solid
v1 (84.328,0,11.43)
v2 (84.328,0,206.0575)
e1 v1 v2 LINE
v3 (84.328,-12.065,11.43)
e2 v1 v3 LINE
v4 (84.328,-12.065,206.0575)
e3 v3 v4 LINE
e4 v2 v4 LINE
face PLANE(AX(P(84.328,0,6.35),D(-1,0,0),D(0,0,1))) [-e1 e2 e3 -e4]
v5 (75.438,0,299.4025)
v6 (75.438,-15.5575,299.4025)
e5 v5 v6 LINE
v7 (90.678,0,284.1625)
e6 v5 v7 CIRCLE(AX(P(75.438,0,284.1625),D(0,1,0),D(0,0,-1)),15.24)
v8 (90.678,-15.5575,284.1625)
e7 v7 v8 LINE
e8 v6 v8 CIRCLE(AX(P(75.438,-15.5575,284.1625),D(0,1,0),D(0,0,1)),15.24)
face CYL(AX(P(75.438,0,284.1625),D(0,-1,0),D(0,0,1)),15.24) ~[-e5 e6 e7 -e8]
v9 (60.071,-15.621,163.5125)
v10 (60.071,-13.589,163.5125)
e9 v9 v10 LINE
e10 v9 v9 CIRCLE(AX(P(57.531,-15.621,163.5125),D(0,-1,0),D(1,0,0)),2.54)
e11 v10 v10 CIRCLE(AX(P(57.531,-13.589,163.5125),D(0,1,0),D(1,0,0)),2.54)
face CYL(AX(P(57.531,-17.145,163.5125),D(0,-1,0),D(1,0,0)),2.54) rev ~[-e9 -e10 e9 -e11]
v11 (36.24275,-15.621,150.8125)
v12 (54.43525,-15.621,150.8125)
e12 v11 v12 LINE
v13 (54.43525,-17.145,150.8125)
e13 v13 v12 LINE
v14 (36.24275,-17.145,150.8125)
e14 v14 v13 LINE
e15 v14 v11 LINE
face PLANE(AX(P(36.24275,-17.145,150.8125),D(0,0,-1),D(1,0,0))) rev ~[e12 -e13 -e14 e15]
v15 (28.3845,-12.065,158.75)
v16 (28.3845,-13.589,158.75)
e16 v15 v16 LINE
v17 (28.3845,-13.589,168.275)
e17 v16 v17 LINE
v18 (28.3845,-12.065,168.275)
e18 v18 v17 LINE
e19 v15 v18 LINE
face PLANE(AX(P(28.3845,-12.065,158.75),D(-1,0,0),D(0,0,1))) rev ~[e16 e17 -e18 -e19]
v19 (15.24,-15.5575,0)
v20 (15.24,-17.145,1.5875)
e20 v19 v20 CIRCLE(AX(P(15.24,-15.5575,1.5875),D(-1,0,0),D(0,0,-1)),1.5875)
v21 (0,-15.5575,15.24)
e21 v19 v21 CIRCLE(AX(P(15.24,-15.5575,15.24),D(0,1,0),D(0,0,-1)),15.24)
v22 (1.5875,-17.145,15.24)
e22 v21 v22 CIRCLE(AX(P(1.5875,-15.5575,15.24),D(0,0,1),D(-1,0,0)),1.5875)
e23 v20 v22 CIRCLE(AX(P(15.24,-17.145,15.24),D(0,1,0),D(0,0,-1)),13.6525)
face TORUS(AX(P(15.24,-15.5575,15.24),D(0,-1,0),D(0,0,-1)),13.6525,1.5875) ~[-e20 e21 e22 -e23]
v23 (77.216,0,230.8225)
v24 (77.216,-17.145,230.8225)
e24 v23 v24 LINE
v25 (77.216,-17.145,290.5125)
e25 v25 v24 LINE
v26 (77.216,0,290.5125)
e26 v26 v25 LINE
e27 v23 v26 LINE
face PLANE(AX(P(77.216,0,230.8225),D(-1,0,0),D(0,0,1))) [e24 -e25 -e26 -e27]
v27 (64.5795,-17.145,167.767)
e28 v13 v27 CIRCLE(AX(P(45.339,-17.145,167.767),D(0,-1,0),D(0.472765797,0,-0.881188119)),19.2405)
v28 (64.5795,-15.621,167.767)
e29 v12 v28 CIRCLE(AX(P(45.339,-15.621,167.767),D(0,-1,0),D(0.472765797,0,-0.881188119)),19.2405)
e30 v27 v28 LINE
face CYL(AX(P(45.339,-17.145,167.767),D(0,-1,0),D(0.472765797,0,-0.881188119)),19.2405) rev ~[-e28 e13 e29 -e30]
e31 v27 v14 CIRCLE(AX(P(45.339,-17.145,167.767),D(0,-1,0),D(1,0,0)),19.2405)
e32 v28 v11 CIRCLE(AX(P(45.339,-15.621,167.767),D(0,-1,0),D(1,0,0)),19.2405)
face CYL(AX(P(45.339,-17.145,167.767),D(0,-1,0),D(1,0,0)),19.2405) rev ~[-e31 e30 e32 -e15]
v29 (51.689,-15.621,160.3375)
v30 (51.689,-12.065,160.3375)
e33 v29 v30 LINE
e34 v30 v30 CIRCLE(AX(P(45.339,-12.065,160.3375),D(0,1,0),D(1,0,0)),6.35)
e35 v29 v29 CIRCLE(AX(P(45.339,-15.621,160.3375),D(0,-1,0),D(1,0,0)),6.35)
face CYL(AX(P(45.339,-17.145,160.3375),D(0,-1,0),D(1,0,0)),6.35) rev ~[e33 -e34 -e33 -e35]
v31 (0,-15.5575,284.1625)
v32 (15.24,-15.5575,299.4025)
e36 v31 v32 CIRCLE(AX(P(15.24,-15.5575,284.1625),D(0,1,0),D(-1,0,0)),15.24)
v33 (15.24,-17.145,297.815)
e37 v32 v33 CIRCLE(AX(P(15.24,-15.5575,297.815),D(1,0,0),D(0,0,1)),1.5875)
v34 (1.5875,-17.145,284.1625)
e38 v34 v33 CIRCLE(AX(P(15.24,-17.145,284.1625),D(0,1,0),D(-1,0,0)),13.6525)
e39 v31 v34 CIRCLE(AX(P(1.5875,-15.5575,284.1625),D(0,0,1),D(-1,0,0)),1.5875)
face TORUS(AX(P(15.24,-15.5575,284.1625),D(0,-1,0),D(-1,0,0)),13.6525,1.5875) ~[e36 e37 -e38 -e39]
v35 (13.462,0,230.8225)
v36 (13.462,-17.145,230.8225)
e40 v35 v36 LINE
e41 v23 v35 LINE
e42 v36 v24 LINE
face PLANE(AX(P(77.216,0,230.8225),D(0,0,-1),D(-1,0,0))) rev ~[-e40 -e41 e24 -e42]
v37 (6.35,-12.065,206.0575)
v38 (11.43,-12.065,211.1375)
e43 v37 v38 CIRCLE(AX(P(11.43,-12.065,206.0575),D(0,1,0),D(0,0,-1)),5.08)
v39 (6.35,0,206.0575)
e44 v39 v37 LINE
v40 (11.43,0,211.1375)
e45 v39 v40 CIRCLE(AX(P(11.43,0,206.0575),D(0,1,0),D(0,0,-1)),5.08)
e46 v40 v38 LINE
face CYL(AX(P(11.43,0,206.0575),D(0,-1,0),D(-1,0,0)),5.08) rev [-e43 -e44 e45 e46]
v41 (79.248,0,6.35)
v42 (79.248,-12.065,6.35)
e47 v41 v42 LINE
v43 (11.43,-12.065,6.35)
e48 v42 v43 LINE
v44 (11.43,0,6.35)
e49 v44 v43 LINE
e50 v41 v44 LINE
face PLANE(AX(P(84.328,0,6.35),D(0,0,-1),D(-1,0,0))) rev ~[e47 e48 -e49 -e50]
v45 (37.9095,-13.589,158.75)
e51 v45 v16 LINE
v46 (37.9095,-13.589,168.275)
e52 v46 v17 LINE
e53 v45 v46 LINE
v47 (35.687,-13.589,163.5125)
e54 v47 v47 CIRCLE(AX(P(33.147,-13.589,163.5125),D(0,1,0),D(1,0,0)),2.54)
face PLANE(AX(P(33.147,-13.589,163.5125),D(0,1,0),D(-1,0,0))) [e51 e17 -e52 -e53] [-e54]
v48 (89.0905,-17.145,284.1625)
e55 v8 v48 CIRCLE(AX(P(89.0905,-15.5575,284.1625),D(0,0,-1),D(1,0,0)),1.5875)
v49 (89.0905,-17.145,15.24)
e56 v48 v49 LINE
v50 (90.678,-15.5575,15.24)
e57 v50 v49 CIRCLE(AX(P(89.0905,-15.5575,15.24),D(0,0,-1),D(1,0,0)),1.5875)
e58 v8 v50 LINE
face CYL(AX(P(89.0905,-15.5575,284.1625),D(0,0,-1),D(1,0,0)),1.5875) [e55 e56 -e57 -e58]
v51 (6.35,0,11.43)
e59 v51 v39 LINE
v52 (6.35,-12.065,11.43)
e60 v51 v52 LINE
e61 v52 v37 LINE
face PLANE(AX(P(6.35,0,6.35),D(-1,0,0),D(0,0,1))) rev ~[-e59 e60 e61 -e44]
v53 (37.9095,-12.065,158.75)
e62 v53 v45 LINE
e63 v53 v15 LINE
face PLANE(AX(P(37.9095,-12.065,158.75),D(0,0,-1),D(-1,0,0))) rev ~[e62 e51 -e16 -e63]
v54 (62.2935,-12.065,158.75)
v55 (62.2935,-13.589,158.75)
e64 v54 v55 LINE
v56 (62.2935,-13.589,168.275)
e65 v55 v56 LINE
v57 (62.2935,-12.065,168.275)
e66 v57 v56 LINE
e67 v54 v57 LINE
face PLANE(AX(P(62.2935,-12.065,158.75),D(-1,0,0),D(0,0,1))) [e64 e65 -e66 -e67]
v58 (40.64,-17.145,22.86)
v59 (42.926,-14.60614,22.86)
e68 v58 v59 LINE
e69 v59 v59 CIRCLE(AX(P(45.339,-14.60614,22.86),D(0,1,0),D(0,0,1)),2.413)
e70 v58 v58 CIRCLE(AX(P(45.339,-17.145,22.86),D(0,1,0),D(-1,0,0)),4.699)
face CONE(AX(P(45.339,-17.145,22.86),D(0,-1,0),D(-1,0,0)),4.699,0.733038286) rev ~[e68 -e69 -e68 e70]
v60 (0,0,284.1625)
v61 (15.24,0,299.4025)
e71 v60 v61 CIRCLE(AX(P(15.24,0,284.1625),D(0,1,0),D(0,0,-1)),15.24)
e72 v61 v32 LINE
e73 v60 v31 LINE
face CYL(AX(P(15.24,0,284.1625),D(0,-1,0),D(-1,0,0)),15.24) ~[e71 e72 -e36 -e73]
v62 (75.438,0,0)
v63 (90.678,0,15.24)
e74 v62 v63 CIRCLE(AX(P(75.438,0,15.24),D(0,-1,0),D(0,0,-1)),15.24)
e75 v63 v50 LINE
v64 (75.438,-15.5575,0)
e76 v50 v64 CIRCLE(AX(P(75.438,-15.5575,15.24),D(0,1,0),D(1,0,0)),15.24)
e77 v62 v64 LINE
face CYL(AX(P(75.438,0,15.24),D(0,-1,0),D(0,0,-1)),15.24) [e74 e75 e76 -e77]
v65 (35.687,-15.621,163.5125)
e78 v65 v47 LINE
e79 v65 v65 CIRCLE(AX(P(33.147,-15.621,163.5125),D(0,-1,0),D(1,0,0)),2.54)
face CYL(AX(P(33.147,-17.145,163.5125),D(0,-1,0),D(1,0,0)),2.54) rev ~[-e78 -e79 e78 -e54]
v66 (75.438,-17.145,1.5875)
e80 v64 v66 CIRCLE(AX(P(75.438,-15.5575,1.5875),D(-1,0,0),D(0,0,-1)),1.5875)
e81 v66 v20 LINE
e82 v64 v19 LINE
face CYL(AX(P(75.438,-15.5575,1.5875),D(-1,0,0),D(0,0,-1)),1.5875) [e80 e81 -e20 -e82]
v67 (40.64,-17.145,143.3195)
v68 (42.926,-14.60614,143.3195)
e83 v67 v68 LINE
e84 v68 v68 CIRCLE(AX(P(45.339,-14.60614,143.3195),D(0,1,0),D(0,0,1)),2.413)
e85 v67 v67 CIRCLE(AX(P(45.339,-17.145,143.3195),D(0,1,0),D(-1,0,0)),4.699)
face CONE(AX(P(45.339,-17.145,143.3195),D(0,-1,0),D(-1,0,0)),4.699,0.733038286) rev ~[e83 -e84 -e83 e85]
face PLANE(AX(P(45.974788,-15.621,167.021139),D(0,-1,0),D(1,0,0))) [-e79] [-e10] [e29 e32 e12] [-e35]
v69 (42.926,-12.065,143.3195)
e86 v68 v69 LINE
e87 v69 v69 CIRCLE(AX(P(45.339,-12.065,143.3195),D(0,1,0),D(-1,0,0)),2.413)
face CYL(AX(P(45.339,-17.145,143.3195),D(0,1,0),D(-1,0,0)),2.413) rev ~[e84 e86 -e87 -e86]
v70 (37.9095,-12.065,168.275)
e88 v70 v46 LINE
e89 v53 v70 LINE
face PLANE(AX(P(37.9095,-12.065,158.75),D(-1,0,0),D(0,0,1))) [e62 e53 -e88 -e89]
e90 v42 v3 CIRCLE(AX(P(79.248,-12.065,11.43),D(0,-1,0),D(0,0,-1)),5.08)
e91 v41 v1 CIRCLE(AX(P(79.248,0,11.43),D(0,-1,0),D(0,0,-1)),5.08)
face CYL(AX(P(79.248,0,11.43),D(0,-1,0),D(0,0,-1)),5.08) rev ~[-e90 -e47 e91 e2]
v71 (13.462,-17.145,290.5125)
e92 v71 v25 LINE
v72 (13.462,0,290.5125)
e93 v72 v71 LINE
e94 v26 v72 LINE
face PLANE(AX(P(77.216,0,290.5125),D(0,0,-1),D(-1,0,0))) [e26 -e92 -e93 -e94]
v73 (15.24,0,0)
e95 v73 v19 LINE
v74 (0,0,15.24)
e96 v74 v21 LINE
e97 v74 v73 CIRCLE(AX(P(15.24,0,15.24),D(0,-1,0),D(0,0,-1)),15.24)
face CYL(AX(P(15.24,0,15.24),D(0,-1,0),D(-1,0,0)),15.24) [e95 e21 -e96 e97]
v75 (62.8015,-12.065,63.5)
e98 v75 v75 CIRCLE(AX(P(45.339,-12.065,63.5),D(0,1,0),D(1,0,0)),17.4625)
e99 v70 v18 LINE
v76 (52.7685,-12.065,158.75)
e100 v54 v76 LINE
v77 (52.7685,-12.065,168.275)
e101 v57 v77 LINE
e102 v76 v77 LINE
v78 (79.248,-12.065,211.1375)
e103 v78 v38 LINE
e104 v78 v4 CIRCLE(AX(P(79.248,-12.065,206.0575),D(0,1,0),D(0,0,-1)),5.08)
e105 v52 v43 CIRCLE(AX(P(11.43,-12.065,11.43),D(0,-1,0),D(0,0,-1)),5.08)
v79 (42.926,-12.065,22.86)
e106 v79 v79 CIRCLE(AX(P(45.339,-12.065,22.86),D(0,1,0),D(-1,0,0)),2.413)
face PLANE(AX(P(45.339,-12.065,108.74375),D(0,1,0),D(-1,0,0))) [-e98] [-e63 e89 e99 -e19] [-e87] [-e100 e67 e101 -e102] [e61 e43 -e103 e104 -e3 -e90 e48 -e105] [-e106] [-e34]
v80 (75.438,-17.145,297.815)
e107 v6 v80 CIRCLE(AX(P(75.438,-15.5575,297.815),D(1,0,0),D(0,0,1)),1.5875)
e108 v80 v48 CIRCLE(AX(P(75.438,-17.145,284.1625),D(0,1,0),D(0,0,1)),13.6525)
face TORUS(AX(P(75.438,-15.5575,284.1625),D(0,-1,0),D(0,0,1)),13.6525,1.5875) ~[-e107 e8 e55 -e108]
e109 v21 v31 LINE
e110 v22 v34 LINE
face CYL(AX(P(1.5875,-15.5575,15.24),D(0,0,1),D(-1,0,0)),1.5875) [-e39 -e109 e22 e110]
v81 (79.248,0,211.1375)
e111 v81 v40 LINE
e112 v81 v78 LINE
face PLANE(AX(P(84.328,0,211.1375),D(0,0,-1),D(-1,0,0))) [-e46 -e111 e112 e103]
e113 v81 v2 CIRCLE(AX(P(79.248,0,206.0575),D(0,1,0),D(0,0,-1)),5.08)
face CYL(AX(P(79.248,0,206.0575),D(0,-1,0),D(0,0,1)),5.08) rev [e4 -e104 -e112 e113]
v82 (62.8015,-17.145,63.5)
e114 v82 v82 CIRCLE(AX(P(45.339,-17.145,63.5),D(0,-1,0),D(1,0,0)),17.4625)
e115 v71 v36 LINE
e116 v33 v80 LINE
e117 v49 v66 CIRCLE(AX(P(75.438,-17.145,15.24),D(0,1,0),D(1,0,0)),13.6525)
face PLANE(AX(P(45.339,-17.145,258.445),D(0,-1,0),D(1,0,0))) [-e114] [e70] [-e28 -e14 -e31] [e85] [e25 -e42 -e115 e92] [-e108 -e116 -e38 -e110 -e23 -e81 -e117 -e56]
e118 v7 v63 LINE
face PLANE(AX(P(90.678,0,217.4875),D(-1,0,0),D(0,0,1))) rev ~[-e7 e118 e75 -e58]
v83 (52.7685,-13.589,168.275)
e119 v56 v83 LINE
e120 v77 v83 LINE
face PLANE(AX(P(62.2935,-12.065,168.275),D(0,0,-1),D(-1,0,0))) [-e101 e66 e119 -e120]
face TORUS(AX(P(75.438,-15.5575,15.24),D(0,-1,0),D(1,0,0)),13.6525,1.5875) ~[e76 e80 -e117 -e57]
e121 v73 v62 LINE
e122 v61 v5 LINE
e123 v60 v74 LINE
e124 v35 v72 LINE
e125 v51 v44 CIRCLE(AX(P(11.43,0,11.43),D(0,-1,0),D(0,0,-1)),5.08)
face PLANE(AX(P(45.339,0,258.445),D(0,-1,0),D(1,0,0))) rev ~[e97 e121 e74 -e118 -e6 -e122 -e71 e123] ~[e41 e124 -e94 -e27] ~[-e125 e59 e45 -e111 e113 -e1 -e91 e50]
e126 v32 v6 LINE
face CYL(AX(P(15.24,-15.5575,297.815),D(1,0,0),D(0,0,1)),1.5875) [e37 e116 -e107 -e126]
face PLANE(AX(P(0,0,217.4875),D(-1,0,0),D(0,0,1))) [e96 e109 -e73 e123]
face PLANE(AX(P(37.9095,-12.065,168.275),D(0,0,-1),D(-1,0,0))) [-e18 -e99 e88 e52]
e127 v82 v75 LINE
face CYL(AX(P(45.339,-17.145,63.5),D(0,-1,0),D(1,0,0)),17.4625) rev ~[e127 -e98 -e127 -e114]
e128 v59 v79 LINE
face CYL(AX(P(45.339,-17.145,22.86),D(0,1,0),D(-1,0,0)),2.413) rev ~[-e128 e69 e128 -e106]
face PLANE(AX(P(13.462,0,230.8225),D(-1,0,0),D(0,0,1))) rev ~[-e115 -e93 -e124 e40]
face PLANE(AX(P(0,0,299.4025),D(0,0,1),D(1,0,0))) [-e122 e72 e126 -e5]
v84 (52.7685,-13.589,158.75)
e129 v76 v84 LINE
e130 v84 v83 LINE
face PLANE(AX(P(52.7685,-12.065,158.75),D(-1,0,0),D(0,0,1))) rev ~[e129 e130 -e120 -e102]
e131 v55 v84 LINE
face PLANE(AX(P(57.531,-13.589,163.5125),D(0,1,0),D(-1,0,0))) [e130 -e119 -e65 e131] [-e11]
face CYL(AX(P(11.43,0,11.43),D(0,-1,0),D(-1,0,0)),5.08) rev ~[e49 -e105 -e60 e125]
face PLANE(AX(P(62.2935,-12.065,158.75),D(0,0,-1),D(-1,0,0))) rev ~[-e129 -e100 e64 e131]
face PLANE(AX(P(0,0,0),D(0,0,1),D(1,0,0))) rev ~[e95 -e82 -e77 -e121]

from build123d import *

# Parameters (mm, degrees)
F0_W           = 90.678
F0_H           = 217.4875
F1_DEPTH       = 17.145
F3_D           = 4.826
F3_CSINK_D     = 9.398
F3_CSINK_ANGLE = 84
F2_R           = 17.4625
F2_R_2         = 6.35
F2_R_3         = 2.54
F4_DEPTH       = 25.4
F5_W           = 77.978
F5_H           = 204.7875
F5_R           = 2.413
F5_R_2         = 17.4625
F5_R_3         = 6.35
F5_R_4         = 2.54
F6_DEPTH       = 12.065
F7_D           = 4.826
F7_CSINK_D     = 9.398
F7_CSINK_ANGLE = 84
F8_W           = 90.678
F8_H           = 81.915
F9_DEPTH       = 17.145
F10_W          = 63.754
F10_H          = 59.69
F11_DEPTH      = 17.146
F12_DEPTH      = 1.524
F13_W          = 9.525
F13_H          = 9.525
F13_R          = 2.54
F14_DEPTH      = 1.524
F15_R          = 5.08
F16_R          = 15.24
F17_R          = 1.5875


with BuildPart() as f1:
    # F0 (on Front) → F1 (new body)
    with BuildSketch(Plane.XZ):
        with Locations((45.339, 108.74375)):
            Rectangle(F0_W, F0_H)
    extrude(amount=F1_DEPTH)

    # F3 (through all)
    with Locations(Plane.XZ.offset(17.145)):
        with Locations((45.339, 22.86)):
            CounterSinkHole(F3_D / 2, F3_CSINK_D / 2, counter_sink_angle=F3_CSINK_ANGLE)

    # F2 (on face) → F4 (cut)
    with BuildSketch(Plane.XZ.offset(17.145)):
        with Locations((45.339, 63.5)):
            Circle(F2_R)
        with Locations((45.339, 160.3375)):
            Circle(F2_R_2)
        with Locations((33.147, 163.5125)):
            Circle(F2_R_3)
        with Locations((57.531, 163.5125)):
            Circle(F2_R_3)
    extrude(amount=-F4_DEPTH, mode=Mode.SUBTRACT)

    # F5 (on face) → F6 (cut)
    with BuildSketch(Plane(origin=(0, 0, 0), x_dir=(-1, 0, 0), z_dir=(0, 1, 0))):
        with Locations((-45.339, 108.74375)):
            Rectangle(F5_W, F5_H)
        with Locations((-45.339, 22.86)):
            Circle(F5_R, mode=Mode.SUBTRACT)
        with Locations((-45.339, 63.5)):
            Circle(F5_R_2, mode=Mode.SUBTRACT)
        with Locations((-45.339, 160.3375)):
            Circle(F5_R_3, mode=Mode.SUBTRACT)
        with Locations((-57.531, 163.5125)):
            Circle(F5_R_4, mode=Mode.SUBTRACT)
        with Locations((-33.147, 163.5125)):
            Circle(F5_R_4, mode=Mode.SUBTRACT)
    extrude(amount=-F6_DEPTH, mode=Mode.SUBTRACT)

    # F7 (through all)
    with Locations(Plane.XZ.offset(17.145)):
        with Locations((45.339, 143.3195)):
            CounterSinkHole(F7_D / 2, F7_CSINK_D / 2, counter_sink_angle=F7_CSINK_ANGLE)

    # F8 (on Front) → F9 (join, through all)
    with BuildSketch(Plane.XZ):
        with Locations((45.339, 258.445)):
            Rectangle(F8_W, F8_H)
    extrude(amount=F9_DEPTH)

    # F10 (on face) → F11 (cut, through all)
    with BuildSketch(Plane(origin=(0, 0, 0), x_dir=(-1, 0, 0), z_dir=(0, 1, 0))):
        with Locations((-45.339, 260.6675)):
            Rectangle(F10_W, F10_H)
    extrude(amount=-F11_DEPTH, mode=Mode.SUBTRACT)

    # F2 (on face) → F12 (cut)
    with BuildSketch(Plane.XZ.offset(17.145)):
        with BuildLine():
            ThreePointArc((54.4352503264, 150.8125), (61.8498032005, 157.8882238651), (64.5795, 167.767))
            ThreePointArc((64.5795, 167.767), (35.4602238651, 184.2778032005), (36.2427496736, 150.8125))
            Line((36.2427496736, 150.8125), (54.4352503264, 150.8125))
        make_face()
        with Locations((45.339, 160.3375)):
            Circle(F2_R_2, mode=Mode.SUBTRACT)
        with Locations((33.147, 163.5125)):
            Circle(F2_R_3, mode=Mode.SUBTRACT)
        with Locations((57.531, 163.5125)):
            Circle(F2_R_3, mode=Mode.SUBTRACT)
    extrude(amount=-F12_DEPTH, mode=Mode.SUBTRACT)

    # F13 (on face) → F14 (cut)
    with BuildSketch(Plane(origin=(0, -12.065, 0), x_dir=(-1, 0, 0), z_dir=(0, 1, 0))):
        with Locations((-57.531, 163.5125)):
            Rectangle(F13_W, F13_H)
        with Locations((-57.531, 163.5125)):
            Circle(F13_R, mode=Mode.SUBTRACT)
        with Locations((-33.147, 163.5125)):
            Rectangle(F13_W, F13_H)
        with Locations((-33.147, 163.5125)):
            Circle(F13_R, mode=Mode.SUBTRACT)
    extrude(amount=-F14_DEPTH, mode=Mode.SUBTRACT)

    # F15
    f15_edges = [f1.edges().sort_by_distance(p)[0] for p in [
        (84.328, -6.0325, 211.1375),
        (6.35, -6.0325, 211.1375),
        (6.35, -6.0325, 6.35),
        (84.328, -6.0325, 6.35),
    ]]
    fillet(f15_edges, radius=F15_R)

    # F16
    f16_edges = [f1.edges().sort_by_distance(p)[0] for p in [
        (90.678, -8.5725, 0),
        (0, -8.5725, 0),
        (0, -8.5725, 299.4025),
        (90.678, -8.5725, 299.4025),
    ]]
    fillet(f16_edges, radius=F16_R)

    # F17
    f17_edges = [f1.edges().sort_by_distance(p)[0] for p in [
        (0, -17.145, 149.70125),
        (45.339, -17.145, 0),
        (4.463693, -17.145, 4.463693),
        (86.214307, -17.145, 4.463693),
        (90.678, -17.145, 149.70125),
        (4.463693, -17.145, 294.938807),
        (86.214307, -17.145, 294.938807),
        (45.339, -17.145, 299.4025),
    ]]
    fillet(f17_edges, radius=F17_R)


solid = f1.part
